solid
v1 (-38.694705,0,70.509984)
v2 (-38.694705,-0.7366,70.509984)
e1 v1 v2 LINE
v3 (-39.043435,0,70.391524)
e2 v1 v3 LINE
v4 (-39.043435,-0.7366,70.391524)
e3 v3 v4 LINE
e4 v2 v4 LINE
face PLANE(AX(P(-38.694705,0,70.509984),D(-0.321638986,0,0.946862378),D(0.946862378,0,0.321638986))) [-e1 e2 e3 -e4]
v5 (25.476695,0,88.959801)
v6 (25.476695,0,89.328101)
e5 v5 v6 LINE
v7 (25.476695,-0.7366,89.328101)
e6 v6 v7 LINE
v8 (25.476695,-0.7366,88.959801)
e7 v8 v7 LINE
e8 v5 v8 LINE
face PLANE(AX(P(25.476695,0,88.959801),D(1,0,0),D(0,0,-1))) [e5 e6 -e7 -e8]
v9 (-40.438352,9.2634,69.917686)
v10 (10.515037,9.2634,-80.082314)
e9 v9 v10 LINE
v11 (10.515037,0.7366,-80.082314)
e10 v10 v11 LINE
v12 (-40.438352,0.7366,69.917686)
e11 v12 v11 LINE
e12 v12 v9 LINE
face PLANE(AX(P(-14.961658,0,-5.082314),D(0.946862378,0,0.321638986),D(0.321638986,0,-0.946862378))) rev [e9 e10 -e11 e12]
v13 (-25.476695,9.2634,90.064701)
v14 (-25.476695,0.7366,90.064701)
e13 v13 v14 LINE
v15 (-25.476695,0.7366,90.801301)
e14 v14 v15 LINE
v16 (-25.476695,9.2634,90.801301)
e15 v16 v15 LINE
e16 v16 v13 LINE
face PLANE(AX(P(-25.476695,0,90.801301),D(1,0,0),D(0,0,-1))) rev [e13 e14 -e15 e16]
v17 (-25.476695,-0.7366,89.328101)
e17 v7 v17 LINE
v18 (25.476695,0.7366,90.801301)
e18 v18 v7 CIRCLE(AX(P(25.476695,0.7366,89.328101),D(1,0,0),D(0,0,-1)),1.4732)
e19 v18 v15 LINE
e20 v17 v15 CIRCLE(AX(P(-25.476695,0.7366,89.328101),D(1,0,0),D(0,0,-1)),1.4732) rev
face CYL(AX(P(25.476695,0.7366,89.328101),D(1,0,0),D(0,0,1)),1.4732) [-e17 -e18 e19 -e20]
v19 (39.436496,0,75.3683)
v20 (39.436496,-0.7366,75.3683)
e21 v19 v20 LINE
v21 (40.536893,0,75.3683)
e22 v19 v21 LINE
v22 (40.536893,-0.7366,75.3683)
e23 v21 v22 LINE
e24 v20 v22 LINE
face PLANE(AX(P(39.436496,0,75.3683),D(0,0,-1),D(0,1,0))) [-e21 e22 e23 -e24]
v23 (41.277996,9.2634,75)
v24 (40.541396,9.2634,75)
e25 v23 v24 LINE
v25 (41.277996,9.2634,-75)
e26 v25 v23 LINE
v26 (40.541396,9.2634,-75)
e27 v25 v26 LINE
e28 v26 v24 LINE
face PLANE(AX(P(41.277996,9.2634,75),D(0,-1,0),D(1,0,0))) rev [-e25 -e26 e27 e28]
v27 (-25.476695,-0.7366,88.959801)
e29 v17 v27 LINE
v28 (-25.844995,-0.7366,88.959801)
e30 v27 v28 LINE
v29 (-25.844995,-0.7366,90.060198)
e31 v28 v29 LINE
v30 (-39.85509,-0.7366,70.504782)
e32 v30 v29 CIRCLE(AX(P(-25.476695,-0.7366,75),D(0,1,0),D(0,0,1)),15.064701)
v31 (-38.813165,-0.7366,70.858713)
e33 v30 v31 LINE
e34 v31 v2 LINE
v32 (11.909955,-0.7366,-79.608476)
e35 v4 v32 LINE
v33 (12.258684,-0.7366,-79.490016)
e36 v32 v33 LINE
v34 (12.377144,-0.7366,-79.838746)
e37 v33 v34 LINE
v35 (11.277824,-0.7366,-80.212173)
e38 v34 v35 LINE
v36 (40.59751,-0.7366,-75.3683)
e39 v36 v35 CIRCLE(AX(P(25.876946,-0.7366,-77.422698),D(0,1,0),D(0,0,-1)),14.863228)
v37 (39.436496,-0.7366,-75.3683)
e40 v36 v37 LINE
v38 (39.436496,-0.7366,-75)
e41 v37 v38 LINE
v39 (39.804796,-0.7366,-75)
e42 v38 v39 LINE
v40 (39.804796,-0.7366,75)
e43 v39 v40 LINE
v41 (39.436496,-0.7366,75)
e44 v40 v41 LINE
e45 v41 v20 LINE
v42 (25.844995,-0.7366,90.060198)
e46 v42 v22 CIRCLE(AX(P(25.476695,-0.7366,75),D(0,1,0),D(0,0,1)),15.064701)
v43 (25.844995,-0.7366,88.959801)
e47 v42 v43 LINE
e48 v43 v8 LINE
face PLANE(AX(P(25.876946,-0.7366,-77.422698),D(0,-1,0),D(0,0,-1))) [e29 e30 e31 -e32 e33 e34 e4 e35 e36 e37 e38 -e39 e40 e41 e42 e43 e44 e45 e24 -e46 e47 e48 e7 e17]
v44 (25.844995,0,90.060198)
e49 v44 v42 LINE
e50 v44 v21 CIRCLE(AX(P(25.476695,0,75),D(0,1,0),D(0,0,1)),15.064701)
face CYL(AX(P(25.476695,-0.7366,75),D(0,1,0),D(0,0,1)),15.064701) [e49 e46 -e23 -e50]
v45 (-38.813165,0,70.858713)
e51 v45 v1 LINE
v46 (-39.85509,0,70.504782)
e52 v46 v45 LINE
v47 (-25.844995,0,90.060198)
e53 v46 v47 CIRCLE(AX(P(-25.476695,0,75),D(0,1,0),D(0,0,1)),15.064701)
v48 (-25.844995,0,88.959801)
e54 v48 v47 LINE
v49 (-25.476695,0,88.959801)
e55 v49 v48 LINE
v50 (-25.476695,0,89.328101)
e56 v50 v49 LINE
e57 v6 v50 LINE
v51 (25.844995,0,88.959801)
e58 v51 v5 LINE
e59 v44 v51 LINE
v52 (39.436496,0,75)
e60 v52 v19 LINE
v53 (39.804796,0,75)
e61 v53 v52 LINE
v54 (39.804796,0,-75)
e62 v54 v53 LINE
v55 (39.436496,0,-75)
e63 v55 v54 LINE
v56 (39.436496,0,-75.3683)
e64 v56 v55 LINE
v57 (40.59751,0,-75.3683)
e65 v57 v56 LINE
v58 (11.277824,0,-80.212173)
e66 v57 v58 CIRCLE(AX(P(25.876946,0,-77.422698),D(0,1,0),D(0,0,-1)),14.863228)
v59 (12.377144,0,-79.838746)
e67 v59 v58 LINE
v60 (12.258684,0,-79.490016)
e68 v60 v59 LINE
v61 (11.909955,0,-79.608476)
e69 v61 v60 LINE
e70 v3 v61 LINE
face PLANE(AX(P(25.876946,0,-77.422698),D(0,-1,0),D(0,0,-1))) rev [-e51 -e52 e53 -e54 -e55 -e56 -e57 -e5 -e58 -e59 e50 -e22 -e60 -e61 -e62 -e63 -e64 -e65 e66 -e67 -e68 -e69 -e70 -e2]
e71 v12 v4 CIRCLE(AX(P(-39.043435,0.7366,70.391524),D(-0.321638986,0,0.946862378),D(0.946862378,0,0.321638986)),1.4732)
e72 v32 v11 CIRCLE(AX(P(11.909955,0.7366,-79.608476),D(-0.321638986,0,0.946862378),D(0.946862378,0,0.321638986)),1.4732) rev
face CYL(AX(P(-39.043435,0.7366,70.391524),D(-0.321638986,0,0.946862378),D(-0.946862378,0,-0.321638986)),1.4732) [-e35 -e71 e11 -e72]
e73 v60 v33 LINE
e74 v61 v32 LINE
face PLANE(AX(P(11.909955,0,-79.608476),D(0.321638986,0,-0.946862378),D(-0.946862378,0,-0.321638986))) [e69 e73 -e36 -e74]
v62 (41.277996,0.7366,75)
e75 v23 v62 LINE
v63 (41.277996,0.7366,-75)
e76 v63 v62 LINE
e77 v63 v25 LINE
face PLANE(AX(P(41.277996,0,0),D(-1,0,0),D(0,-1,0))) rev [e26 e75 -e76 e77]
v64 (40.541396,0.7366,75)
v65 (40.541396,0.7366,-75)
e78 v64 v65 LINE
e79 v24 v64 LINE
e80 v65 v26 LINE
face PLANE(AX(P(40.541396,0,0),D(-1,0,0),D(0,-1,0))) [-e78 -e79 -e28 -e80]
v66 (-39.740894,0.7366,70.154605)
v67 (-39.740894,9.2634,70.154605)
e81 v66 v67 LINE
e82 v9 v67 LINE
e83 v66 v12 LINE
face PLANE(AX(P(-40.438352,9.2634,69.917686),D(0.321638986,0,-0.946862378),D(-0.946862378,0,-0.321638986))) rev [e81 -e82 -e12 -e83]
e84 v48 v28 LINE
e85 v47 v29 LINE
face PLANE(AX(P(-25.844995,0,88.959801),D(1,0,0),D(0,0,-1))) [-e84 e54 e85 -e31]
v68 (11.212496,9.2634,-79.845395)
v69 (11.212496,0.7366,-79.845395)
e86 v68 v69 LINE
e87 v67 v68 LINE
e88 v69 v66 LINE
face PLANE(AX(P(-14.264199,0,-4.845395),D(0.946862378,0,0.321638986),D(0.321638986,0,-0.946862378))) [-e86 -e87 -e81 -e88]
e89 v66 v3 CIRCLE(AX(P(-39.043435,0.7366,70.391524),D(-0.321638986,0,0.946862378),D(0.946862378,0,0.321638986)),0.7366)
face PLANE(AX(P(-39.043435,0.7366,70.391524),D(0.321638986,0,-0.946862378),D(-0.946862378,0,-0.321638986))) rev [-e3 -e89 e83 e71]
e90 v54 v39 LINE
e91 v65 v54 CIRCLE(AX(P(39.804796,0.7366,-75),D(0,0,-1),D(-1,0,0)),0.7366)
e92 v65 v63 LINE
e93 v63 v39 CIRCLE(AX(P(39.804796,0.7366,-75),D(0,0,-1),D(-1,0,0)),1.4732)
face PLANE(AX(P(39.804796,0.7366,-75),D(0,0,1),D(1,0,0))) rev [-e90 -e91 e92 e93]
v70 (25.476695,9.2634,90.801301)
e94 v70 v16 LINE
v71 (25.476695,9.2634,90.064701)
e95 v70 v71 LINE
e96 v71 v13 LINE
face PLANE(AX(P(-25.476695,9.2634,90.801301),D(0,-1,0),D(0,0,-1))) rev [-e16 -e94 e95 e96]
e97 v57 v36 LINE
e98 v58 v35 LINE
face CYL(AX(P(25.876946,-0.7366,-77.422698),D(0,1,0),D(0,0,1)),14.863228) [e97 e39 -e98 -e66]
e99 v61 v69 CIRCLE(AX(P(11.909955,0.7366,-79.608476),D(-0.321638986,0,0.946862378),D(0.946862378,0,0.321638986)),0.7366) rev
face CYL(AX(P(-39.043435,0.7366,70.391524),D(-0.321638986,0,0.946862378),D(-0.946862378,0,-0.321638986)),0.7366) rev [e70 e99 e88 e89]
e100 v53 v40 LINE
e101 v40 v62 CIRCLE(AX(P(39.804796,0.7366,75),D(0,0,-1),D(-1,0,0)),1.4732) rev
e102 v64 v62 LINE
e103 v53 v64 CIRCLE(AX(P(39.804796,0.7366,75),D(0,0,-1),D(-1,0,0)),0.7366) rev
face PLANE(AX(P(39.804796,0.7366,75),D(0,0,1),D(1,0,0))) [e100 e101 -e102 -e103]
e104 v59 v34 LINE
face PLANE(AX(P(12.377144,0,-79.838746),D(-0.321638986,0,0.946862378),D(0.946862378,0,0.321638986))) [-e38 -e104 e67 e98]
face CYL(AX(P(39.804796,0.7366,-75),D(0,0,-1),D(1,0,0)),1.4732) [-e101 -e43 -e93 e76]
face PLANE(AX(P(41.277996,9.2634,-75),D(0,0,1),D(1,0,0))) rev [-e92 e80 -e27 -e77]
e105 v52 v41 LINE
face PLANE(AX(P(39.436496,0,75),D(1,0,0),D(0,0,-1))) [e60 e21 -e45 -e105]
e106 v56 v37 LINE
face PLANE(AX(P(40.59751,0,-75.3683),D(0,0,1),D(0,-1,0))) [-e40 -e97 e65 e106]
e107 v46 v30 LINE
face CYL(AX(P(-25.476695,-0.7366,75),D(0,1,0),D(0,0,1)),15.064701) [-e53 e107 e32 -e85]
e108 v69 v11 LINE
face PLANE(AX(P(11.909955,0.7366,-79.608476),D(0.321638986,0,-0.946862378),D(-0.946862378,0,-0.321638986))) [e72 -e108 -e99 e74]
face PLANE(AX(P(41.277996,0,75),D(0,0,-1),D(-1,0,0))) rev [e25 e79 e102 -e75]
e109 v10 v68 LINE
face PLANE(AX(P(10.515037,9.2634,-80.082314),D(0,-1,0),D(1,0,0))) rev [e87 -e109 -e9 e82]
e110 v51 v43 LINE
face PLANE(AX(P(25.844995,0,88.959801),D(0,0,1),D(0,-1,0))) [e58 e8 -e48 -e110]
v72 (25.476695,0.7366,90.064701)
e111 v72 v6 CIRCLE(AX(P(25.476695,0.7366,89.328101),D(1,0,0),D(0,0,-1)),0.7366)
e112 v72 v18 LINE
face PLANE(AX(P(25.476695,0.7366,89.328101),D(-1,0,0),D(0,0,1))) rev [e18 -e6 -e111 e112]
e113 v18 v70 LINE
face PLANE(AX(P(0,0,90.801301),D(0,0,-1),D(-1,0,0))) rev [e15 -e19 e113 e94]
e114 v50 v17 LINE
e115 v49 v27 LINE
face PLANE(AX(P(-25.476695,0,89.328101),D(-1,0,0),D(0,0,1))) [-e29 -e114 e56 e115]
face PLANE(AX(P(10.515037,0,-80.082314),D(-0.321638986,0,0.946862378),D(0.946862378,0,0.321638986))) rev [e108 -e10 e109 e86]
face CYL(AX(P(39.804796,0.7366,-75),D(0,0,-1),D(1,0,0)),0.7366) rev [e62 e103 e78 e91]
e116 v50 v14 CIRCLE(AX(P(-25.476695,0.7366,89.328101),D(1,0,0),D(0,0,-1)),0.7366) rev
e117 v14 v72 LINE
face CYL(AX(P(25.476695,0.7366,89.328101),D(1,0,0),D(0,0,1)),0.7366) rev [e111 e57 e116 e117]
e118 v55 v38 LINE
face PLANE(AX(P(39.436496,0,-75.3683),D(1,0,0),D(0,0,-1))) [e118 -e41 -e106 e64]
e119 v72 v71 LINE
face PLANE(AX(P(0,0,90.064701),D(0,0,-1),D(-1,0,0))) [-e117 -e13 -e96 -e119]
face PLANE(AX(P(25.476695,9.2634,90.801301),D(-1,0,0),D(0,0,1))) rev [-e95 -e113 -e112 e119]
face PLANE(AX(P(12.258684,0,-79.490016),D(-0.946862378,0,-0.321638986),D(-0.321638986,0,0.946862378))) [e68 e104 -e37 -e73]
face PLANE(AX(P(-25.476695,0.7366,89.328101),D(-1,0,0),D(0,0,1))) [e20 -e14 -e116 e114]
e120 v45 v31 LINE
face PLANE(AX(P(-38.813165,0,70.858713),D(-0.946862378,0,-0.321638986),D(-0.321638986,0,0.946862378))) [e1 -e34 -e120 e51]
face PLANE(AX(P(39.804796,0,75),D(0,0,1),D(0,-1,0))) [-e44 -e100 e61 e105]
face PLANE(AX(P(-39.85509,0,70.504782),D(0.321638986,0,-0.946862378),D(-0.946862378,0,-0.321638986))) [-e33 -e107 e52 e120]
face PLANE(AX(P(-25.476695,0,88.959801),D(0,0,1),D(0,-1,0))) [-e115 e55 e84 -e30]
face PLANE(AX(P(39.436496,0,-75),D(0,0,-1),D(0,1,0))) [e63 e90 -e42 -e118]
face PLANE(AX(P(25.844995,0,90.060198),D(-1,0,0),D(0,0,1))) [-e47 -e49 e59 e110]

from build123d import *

# Parameters (mm, degrees)
BASE_FLANGE1_DEPTH            = 0.7366
EDGE_FLANGE1_STRIP_W          = 4.4196
EDGE_FLANGE1_STRIP_H          = 0.7366
EDGE_FLANGE1_STRIP_CUT_DEPTH  = 150
EDGE_FLANGE1_RELIEF_W         = 4.7879
EDGE_FLANGE1_RELIEF_H         = 0.3683
EDGE_FLANGE1_RELIEF_CUT_DEPTH = 0.7366
EDGE_FLANGE1_DEPTH            = 150
EDGE_FLANGE2_STRIP_W          = 4.4196
EDGE_FLANGE2_STRIP_H          = 0.7366
EDGE_FLANGE2_STRIP_CUT_DEPTH  = 50.953389831
EDGE_FLANGE2_RELIEF_W         = 4.7879
EDGE_FLANGE2_RELIEF_H         = 0.3683
EDGE_FLANGE2_RELIEF_CUT_DEPTH = 0.7366
EDGE_FLANGE2_DEPTH            = 50.953389831
EDGE_FLANGE3_STRIP_W          = 4.4196
EDGE_FLANGE3_STRIP_H          = 0.7366
EDGE_FLANGE3_STRIP_CUT_DEPTH  = 158.417953324
EDGE_FLANGE3_RELIEF_W         = 4.7879
EDGE_FLANGE3_RELIEF_H         = 0.3683
EDGE_FLANGE3_RELIEF_CUT_DEPTH = 0.7366
EDGE_FLANGE3_DEPTH            = 158.417953324


# Sheet-metal steps are written as plain solids
with BuildPart() as part:
    # Sketch1 → Base-Flange1 (new body)
    with BuildSketch(Plane(origin=(0, 0, 0), x_dir=(1, 0, 0), z_dir=(0, 1, 0))):
        with BuildLine():
            Line((40.54139599, 75), (40.54139599, -75))
            ThreePointArc((40.54139599, -75), (36.129047202, -85.652352287), (25.476694915, -90.064701075))
            Line((25.476694915, -90.064701075), (-25.476694915, -90.064701075))
            ThreePointArc((-25.476694915, -90.064701075), (-37.722911645, -83.773562235), (-39.740893599, -70.154604826))
            Line((-39.740893599, -70.154604826), (11.212496231, 79.845395174))
            ThreePointArc((11.212496231, 79.845395174), (28.299643698, 92.087147467), (40.54139599, 75))
        make_face()
    extrude(amount=-BASE_FLANGE1_DEPTH)

    # Edge-Flange1 strip (across the edge) → Edge-Flange1 strip cut (cut)
    with BuildSketch(Plane(origin=(40.54139599, 0, 75), x_dir=(-1, 0, 0), z_dir=(0, 0, -1))):
        with Locations((-1.4732, -0.3683)):
            Rectangle(EDGE_FLANGE1_STRIP_W, EDGE_FLANGE1_STRIP_H)
    extrude(amount=EDGE_FLANGE1_STRIP_CUT_DEPTH, mode=Mode.SUBTRACT)

    # Edge-Flange1 relief (on the sheet) → Edge-Flange1 relief cut (cut)
    with BuildSketch(Plane(origin=(39.80479599, 0, 75), x_dir=(-1, 0, 0), z_dir=(0, 1, 0))):
        with Locations((-2.02565, 0.18415)):
            Rectangle(EDGE_FLANGE1_RELIEF_W, EDGE_FLANGE1_RELIEF_H)
        with Locations((-2.02565, -150.18415)):
            Rectangle(EDGE_FLANGE1_RELIEF_W, EDGE_FLANGE1_RELIEF_H)
    extrude(amount=-EDGE_FLANGE1_RELIEF_CUT_DEPTH, mode=Mode.SUBTRACT)

    # Edge-Flange1 section (across the edge) → Edge-Flange1 (add)
    with BuildSketch(Plane(origin=(40.54139599, 0, 75), x_dir=(-1, 0, 0), z_dir=(0, 0, -1))):
        with BuildLine():
            Line((-0.7366, 0.7366), (-0.7366, 9.2634))
            Line((-0.7366, 9.2634), (0, 9.2634))
            Line((0, 9.2634), (0, 0.7366))
            ThreePointArc((0, 0.7366), (0.215745145, 0.215745145), (0.7366, 0))
            Line((0.7366, 0), (0.7366, -0.7366))
            ThreePointArc((0.7366, -0.7366), (-0.30510971, -0.30510971), (-0.7366, 0.7366))
        make_face()
    extrude(amount=EDGE_FLANGE1_DEPTH)

    # Edge-Flange2 strip (across the edge) → Edge-Flange2 strip cut (cut)
    with BuildSketch(Plane(origin=(-25.476694915, 0, 90.064701075), x_dir=(0, 0, -1), z_dir=(1, 0, 0))):
        with Locations((-1.4732, -0.3683)):
            Rectangle(EDGE_FLANGE2_STRIP_W, EDGE_FLANGE2_STRIP_H)
    extrude(amount=EDGE_FLANGE2_STRIP_CUT_DEPTH, mode=Mode.SUBTRACT)

    # Edge-Flange2 relief (on the sheet) → Edge-Flange2 relief cut (cut)
    with BuildSketch(Plane(origin=(-25.476694915, 0, 89.328101075), x_dir=(0, 0, -1), z_dir=(0, 1, 0))):
        with Locations((-2.02565, 0.18415)):
            Rectangle(EDGE_FLANGE2_RELIEF_W, EDGE_FLANGE2_RELIEF_H)
        with Locations((-2.02565, -51.137539831)):
            Rectangle(EDGE_FLANGE2_RELIEF_W, EDGE_FLANGE2_RELIEF_H)
    extrude(amount=-EDGE_FLANGE2_RELIEF_CUT_DEPTH, mode=Mode.SUBTRACT)

    # Edge-Flange2 section (across the edge) → Edge-Flange2 (add)
    with BuildSketch(Plane(origin=(-25.476694915, 0, 90.064701075), x_dir=(0, 0, -1), z_dir=(1, 0, 0))):
        with BuildLine():
            Line((-0.7366, 0.7366), (-0.7366, 9.2634))
            Line((-0.7366, 9.2634), (0, 9.2634))
            Line((0, 9.2634), (0, 0.7366))
            ThreePointArc((0, 0.7366), (0.215745145, 0.215745145), (0.7366, 0))
            Line((0.7366, 0), (0.7366, -0.7366))
            ThreePointArc((0.7366, -0.7366), (-0.30510971, -0.30510971), (-0.7366, 0.7366))
        make_face()
    extrude(amount=EDGE_FLANGE2_DEPTH)

    # Edge-Flange3 strip (across the edge) → Edge-Flange3 strip cut (cut)
    with BuildSketch(Plane(origin=(11.212496231, 0, -79.845395174), x_dir=(0.9468623779885023, 3.4914813388431334e-15, 0.3216389857432692), z_dir=(-0.3216389857432692, 0, 0.9468623779885023))):
        with Locations((-1.4732, -0.3683)):
            Rectangle(EDGE_FLANGE3_STRIP_W, EDGE_FLANGE3_STRIP_H)
    extrude(amount=EDGE_FLANGE3_STRIP_CUT_DEPTH, mode=Mode.SUBTRACT)

    # Edge-Flange3 relief (on the sheet) → Edge-Flange3 relief cut (cut)
    with BuildSketch(Plane(origin=(11.909955059, 0, -79.608475897), x_dir=(0.9468623779885023, 6.982962677686267e-15, 0.3216389857432692), z_dir=(0, 1, 0))):
        with Locations((-2.02565, 0.18415)):
            Rectangle(EDGE_FLANGE3_RELIEF_W, EDGE_FLANGE3_RELIEF_H)
        with Locations((-2.02565, -158.602103324)):
            Rectangle(EDGE_FLANGE3_RELIEF_W, EDGE_FLANGE3_RELIEF_H)
    extrude(amount=-EDGE_FLANGE3_RELIEF_CUT_DEPTH, mode=Mode.SUBTRACT)

    # Edge-Flange3 section (across the edge) → Edge-Flange3 (add)
    with BuildSketch(Plane(origin=(11.212496231, 0, -79.845395174), x_dir=(0.9468623779885023, 3.4914813388431334e-15, 0.3216389857432692), z_dir=(-0.3216389857432692, 0, 0.9468623779885023))):
        with BuildLine():
            Line((-0.7366, 0.7366), (-0.7366, 9.2634))
            Line((-0.7366, 9.2634), (0, 9.2634))
            Line((0, 9.2634), (0, 0.7366))
            ThreePointArc((0, 0.7366), (0.215745145, 0.215745145), (0.7366, 0))
            Line((0.7366, 0), (0.7366, -0.7366))
            ThreePointArc((0.7366, -0.7366), (-0.30510971, -0.30510971), (-0.7366, 0.7366))
        make_face()
    extrude(amount=EDGE_FLANGE3_DEPTH)


solid = part.part
